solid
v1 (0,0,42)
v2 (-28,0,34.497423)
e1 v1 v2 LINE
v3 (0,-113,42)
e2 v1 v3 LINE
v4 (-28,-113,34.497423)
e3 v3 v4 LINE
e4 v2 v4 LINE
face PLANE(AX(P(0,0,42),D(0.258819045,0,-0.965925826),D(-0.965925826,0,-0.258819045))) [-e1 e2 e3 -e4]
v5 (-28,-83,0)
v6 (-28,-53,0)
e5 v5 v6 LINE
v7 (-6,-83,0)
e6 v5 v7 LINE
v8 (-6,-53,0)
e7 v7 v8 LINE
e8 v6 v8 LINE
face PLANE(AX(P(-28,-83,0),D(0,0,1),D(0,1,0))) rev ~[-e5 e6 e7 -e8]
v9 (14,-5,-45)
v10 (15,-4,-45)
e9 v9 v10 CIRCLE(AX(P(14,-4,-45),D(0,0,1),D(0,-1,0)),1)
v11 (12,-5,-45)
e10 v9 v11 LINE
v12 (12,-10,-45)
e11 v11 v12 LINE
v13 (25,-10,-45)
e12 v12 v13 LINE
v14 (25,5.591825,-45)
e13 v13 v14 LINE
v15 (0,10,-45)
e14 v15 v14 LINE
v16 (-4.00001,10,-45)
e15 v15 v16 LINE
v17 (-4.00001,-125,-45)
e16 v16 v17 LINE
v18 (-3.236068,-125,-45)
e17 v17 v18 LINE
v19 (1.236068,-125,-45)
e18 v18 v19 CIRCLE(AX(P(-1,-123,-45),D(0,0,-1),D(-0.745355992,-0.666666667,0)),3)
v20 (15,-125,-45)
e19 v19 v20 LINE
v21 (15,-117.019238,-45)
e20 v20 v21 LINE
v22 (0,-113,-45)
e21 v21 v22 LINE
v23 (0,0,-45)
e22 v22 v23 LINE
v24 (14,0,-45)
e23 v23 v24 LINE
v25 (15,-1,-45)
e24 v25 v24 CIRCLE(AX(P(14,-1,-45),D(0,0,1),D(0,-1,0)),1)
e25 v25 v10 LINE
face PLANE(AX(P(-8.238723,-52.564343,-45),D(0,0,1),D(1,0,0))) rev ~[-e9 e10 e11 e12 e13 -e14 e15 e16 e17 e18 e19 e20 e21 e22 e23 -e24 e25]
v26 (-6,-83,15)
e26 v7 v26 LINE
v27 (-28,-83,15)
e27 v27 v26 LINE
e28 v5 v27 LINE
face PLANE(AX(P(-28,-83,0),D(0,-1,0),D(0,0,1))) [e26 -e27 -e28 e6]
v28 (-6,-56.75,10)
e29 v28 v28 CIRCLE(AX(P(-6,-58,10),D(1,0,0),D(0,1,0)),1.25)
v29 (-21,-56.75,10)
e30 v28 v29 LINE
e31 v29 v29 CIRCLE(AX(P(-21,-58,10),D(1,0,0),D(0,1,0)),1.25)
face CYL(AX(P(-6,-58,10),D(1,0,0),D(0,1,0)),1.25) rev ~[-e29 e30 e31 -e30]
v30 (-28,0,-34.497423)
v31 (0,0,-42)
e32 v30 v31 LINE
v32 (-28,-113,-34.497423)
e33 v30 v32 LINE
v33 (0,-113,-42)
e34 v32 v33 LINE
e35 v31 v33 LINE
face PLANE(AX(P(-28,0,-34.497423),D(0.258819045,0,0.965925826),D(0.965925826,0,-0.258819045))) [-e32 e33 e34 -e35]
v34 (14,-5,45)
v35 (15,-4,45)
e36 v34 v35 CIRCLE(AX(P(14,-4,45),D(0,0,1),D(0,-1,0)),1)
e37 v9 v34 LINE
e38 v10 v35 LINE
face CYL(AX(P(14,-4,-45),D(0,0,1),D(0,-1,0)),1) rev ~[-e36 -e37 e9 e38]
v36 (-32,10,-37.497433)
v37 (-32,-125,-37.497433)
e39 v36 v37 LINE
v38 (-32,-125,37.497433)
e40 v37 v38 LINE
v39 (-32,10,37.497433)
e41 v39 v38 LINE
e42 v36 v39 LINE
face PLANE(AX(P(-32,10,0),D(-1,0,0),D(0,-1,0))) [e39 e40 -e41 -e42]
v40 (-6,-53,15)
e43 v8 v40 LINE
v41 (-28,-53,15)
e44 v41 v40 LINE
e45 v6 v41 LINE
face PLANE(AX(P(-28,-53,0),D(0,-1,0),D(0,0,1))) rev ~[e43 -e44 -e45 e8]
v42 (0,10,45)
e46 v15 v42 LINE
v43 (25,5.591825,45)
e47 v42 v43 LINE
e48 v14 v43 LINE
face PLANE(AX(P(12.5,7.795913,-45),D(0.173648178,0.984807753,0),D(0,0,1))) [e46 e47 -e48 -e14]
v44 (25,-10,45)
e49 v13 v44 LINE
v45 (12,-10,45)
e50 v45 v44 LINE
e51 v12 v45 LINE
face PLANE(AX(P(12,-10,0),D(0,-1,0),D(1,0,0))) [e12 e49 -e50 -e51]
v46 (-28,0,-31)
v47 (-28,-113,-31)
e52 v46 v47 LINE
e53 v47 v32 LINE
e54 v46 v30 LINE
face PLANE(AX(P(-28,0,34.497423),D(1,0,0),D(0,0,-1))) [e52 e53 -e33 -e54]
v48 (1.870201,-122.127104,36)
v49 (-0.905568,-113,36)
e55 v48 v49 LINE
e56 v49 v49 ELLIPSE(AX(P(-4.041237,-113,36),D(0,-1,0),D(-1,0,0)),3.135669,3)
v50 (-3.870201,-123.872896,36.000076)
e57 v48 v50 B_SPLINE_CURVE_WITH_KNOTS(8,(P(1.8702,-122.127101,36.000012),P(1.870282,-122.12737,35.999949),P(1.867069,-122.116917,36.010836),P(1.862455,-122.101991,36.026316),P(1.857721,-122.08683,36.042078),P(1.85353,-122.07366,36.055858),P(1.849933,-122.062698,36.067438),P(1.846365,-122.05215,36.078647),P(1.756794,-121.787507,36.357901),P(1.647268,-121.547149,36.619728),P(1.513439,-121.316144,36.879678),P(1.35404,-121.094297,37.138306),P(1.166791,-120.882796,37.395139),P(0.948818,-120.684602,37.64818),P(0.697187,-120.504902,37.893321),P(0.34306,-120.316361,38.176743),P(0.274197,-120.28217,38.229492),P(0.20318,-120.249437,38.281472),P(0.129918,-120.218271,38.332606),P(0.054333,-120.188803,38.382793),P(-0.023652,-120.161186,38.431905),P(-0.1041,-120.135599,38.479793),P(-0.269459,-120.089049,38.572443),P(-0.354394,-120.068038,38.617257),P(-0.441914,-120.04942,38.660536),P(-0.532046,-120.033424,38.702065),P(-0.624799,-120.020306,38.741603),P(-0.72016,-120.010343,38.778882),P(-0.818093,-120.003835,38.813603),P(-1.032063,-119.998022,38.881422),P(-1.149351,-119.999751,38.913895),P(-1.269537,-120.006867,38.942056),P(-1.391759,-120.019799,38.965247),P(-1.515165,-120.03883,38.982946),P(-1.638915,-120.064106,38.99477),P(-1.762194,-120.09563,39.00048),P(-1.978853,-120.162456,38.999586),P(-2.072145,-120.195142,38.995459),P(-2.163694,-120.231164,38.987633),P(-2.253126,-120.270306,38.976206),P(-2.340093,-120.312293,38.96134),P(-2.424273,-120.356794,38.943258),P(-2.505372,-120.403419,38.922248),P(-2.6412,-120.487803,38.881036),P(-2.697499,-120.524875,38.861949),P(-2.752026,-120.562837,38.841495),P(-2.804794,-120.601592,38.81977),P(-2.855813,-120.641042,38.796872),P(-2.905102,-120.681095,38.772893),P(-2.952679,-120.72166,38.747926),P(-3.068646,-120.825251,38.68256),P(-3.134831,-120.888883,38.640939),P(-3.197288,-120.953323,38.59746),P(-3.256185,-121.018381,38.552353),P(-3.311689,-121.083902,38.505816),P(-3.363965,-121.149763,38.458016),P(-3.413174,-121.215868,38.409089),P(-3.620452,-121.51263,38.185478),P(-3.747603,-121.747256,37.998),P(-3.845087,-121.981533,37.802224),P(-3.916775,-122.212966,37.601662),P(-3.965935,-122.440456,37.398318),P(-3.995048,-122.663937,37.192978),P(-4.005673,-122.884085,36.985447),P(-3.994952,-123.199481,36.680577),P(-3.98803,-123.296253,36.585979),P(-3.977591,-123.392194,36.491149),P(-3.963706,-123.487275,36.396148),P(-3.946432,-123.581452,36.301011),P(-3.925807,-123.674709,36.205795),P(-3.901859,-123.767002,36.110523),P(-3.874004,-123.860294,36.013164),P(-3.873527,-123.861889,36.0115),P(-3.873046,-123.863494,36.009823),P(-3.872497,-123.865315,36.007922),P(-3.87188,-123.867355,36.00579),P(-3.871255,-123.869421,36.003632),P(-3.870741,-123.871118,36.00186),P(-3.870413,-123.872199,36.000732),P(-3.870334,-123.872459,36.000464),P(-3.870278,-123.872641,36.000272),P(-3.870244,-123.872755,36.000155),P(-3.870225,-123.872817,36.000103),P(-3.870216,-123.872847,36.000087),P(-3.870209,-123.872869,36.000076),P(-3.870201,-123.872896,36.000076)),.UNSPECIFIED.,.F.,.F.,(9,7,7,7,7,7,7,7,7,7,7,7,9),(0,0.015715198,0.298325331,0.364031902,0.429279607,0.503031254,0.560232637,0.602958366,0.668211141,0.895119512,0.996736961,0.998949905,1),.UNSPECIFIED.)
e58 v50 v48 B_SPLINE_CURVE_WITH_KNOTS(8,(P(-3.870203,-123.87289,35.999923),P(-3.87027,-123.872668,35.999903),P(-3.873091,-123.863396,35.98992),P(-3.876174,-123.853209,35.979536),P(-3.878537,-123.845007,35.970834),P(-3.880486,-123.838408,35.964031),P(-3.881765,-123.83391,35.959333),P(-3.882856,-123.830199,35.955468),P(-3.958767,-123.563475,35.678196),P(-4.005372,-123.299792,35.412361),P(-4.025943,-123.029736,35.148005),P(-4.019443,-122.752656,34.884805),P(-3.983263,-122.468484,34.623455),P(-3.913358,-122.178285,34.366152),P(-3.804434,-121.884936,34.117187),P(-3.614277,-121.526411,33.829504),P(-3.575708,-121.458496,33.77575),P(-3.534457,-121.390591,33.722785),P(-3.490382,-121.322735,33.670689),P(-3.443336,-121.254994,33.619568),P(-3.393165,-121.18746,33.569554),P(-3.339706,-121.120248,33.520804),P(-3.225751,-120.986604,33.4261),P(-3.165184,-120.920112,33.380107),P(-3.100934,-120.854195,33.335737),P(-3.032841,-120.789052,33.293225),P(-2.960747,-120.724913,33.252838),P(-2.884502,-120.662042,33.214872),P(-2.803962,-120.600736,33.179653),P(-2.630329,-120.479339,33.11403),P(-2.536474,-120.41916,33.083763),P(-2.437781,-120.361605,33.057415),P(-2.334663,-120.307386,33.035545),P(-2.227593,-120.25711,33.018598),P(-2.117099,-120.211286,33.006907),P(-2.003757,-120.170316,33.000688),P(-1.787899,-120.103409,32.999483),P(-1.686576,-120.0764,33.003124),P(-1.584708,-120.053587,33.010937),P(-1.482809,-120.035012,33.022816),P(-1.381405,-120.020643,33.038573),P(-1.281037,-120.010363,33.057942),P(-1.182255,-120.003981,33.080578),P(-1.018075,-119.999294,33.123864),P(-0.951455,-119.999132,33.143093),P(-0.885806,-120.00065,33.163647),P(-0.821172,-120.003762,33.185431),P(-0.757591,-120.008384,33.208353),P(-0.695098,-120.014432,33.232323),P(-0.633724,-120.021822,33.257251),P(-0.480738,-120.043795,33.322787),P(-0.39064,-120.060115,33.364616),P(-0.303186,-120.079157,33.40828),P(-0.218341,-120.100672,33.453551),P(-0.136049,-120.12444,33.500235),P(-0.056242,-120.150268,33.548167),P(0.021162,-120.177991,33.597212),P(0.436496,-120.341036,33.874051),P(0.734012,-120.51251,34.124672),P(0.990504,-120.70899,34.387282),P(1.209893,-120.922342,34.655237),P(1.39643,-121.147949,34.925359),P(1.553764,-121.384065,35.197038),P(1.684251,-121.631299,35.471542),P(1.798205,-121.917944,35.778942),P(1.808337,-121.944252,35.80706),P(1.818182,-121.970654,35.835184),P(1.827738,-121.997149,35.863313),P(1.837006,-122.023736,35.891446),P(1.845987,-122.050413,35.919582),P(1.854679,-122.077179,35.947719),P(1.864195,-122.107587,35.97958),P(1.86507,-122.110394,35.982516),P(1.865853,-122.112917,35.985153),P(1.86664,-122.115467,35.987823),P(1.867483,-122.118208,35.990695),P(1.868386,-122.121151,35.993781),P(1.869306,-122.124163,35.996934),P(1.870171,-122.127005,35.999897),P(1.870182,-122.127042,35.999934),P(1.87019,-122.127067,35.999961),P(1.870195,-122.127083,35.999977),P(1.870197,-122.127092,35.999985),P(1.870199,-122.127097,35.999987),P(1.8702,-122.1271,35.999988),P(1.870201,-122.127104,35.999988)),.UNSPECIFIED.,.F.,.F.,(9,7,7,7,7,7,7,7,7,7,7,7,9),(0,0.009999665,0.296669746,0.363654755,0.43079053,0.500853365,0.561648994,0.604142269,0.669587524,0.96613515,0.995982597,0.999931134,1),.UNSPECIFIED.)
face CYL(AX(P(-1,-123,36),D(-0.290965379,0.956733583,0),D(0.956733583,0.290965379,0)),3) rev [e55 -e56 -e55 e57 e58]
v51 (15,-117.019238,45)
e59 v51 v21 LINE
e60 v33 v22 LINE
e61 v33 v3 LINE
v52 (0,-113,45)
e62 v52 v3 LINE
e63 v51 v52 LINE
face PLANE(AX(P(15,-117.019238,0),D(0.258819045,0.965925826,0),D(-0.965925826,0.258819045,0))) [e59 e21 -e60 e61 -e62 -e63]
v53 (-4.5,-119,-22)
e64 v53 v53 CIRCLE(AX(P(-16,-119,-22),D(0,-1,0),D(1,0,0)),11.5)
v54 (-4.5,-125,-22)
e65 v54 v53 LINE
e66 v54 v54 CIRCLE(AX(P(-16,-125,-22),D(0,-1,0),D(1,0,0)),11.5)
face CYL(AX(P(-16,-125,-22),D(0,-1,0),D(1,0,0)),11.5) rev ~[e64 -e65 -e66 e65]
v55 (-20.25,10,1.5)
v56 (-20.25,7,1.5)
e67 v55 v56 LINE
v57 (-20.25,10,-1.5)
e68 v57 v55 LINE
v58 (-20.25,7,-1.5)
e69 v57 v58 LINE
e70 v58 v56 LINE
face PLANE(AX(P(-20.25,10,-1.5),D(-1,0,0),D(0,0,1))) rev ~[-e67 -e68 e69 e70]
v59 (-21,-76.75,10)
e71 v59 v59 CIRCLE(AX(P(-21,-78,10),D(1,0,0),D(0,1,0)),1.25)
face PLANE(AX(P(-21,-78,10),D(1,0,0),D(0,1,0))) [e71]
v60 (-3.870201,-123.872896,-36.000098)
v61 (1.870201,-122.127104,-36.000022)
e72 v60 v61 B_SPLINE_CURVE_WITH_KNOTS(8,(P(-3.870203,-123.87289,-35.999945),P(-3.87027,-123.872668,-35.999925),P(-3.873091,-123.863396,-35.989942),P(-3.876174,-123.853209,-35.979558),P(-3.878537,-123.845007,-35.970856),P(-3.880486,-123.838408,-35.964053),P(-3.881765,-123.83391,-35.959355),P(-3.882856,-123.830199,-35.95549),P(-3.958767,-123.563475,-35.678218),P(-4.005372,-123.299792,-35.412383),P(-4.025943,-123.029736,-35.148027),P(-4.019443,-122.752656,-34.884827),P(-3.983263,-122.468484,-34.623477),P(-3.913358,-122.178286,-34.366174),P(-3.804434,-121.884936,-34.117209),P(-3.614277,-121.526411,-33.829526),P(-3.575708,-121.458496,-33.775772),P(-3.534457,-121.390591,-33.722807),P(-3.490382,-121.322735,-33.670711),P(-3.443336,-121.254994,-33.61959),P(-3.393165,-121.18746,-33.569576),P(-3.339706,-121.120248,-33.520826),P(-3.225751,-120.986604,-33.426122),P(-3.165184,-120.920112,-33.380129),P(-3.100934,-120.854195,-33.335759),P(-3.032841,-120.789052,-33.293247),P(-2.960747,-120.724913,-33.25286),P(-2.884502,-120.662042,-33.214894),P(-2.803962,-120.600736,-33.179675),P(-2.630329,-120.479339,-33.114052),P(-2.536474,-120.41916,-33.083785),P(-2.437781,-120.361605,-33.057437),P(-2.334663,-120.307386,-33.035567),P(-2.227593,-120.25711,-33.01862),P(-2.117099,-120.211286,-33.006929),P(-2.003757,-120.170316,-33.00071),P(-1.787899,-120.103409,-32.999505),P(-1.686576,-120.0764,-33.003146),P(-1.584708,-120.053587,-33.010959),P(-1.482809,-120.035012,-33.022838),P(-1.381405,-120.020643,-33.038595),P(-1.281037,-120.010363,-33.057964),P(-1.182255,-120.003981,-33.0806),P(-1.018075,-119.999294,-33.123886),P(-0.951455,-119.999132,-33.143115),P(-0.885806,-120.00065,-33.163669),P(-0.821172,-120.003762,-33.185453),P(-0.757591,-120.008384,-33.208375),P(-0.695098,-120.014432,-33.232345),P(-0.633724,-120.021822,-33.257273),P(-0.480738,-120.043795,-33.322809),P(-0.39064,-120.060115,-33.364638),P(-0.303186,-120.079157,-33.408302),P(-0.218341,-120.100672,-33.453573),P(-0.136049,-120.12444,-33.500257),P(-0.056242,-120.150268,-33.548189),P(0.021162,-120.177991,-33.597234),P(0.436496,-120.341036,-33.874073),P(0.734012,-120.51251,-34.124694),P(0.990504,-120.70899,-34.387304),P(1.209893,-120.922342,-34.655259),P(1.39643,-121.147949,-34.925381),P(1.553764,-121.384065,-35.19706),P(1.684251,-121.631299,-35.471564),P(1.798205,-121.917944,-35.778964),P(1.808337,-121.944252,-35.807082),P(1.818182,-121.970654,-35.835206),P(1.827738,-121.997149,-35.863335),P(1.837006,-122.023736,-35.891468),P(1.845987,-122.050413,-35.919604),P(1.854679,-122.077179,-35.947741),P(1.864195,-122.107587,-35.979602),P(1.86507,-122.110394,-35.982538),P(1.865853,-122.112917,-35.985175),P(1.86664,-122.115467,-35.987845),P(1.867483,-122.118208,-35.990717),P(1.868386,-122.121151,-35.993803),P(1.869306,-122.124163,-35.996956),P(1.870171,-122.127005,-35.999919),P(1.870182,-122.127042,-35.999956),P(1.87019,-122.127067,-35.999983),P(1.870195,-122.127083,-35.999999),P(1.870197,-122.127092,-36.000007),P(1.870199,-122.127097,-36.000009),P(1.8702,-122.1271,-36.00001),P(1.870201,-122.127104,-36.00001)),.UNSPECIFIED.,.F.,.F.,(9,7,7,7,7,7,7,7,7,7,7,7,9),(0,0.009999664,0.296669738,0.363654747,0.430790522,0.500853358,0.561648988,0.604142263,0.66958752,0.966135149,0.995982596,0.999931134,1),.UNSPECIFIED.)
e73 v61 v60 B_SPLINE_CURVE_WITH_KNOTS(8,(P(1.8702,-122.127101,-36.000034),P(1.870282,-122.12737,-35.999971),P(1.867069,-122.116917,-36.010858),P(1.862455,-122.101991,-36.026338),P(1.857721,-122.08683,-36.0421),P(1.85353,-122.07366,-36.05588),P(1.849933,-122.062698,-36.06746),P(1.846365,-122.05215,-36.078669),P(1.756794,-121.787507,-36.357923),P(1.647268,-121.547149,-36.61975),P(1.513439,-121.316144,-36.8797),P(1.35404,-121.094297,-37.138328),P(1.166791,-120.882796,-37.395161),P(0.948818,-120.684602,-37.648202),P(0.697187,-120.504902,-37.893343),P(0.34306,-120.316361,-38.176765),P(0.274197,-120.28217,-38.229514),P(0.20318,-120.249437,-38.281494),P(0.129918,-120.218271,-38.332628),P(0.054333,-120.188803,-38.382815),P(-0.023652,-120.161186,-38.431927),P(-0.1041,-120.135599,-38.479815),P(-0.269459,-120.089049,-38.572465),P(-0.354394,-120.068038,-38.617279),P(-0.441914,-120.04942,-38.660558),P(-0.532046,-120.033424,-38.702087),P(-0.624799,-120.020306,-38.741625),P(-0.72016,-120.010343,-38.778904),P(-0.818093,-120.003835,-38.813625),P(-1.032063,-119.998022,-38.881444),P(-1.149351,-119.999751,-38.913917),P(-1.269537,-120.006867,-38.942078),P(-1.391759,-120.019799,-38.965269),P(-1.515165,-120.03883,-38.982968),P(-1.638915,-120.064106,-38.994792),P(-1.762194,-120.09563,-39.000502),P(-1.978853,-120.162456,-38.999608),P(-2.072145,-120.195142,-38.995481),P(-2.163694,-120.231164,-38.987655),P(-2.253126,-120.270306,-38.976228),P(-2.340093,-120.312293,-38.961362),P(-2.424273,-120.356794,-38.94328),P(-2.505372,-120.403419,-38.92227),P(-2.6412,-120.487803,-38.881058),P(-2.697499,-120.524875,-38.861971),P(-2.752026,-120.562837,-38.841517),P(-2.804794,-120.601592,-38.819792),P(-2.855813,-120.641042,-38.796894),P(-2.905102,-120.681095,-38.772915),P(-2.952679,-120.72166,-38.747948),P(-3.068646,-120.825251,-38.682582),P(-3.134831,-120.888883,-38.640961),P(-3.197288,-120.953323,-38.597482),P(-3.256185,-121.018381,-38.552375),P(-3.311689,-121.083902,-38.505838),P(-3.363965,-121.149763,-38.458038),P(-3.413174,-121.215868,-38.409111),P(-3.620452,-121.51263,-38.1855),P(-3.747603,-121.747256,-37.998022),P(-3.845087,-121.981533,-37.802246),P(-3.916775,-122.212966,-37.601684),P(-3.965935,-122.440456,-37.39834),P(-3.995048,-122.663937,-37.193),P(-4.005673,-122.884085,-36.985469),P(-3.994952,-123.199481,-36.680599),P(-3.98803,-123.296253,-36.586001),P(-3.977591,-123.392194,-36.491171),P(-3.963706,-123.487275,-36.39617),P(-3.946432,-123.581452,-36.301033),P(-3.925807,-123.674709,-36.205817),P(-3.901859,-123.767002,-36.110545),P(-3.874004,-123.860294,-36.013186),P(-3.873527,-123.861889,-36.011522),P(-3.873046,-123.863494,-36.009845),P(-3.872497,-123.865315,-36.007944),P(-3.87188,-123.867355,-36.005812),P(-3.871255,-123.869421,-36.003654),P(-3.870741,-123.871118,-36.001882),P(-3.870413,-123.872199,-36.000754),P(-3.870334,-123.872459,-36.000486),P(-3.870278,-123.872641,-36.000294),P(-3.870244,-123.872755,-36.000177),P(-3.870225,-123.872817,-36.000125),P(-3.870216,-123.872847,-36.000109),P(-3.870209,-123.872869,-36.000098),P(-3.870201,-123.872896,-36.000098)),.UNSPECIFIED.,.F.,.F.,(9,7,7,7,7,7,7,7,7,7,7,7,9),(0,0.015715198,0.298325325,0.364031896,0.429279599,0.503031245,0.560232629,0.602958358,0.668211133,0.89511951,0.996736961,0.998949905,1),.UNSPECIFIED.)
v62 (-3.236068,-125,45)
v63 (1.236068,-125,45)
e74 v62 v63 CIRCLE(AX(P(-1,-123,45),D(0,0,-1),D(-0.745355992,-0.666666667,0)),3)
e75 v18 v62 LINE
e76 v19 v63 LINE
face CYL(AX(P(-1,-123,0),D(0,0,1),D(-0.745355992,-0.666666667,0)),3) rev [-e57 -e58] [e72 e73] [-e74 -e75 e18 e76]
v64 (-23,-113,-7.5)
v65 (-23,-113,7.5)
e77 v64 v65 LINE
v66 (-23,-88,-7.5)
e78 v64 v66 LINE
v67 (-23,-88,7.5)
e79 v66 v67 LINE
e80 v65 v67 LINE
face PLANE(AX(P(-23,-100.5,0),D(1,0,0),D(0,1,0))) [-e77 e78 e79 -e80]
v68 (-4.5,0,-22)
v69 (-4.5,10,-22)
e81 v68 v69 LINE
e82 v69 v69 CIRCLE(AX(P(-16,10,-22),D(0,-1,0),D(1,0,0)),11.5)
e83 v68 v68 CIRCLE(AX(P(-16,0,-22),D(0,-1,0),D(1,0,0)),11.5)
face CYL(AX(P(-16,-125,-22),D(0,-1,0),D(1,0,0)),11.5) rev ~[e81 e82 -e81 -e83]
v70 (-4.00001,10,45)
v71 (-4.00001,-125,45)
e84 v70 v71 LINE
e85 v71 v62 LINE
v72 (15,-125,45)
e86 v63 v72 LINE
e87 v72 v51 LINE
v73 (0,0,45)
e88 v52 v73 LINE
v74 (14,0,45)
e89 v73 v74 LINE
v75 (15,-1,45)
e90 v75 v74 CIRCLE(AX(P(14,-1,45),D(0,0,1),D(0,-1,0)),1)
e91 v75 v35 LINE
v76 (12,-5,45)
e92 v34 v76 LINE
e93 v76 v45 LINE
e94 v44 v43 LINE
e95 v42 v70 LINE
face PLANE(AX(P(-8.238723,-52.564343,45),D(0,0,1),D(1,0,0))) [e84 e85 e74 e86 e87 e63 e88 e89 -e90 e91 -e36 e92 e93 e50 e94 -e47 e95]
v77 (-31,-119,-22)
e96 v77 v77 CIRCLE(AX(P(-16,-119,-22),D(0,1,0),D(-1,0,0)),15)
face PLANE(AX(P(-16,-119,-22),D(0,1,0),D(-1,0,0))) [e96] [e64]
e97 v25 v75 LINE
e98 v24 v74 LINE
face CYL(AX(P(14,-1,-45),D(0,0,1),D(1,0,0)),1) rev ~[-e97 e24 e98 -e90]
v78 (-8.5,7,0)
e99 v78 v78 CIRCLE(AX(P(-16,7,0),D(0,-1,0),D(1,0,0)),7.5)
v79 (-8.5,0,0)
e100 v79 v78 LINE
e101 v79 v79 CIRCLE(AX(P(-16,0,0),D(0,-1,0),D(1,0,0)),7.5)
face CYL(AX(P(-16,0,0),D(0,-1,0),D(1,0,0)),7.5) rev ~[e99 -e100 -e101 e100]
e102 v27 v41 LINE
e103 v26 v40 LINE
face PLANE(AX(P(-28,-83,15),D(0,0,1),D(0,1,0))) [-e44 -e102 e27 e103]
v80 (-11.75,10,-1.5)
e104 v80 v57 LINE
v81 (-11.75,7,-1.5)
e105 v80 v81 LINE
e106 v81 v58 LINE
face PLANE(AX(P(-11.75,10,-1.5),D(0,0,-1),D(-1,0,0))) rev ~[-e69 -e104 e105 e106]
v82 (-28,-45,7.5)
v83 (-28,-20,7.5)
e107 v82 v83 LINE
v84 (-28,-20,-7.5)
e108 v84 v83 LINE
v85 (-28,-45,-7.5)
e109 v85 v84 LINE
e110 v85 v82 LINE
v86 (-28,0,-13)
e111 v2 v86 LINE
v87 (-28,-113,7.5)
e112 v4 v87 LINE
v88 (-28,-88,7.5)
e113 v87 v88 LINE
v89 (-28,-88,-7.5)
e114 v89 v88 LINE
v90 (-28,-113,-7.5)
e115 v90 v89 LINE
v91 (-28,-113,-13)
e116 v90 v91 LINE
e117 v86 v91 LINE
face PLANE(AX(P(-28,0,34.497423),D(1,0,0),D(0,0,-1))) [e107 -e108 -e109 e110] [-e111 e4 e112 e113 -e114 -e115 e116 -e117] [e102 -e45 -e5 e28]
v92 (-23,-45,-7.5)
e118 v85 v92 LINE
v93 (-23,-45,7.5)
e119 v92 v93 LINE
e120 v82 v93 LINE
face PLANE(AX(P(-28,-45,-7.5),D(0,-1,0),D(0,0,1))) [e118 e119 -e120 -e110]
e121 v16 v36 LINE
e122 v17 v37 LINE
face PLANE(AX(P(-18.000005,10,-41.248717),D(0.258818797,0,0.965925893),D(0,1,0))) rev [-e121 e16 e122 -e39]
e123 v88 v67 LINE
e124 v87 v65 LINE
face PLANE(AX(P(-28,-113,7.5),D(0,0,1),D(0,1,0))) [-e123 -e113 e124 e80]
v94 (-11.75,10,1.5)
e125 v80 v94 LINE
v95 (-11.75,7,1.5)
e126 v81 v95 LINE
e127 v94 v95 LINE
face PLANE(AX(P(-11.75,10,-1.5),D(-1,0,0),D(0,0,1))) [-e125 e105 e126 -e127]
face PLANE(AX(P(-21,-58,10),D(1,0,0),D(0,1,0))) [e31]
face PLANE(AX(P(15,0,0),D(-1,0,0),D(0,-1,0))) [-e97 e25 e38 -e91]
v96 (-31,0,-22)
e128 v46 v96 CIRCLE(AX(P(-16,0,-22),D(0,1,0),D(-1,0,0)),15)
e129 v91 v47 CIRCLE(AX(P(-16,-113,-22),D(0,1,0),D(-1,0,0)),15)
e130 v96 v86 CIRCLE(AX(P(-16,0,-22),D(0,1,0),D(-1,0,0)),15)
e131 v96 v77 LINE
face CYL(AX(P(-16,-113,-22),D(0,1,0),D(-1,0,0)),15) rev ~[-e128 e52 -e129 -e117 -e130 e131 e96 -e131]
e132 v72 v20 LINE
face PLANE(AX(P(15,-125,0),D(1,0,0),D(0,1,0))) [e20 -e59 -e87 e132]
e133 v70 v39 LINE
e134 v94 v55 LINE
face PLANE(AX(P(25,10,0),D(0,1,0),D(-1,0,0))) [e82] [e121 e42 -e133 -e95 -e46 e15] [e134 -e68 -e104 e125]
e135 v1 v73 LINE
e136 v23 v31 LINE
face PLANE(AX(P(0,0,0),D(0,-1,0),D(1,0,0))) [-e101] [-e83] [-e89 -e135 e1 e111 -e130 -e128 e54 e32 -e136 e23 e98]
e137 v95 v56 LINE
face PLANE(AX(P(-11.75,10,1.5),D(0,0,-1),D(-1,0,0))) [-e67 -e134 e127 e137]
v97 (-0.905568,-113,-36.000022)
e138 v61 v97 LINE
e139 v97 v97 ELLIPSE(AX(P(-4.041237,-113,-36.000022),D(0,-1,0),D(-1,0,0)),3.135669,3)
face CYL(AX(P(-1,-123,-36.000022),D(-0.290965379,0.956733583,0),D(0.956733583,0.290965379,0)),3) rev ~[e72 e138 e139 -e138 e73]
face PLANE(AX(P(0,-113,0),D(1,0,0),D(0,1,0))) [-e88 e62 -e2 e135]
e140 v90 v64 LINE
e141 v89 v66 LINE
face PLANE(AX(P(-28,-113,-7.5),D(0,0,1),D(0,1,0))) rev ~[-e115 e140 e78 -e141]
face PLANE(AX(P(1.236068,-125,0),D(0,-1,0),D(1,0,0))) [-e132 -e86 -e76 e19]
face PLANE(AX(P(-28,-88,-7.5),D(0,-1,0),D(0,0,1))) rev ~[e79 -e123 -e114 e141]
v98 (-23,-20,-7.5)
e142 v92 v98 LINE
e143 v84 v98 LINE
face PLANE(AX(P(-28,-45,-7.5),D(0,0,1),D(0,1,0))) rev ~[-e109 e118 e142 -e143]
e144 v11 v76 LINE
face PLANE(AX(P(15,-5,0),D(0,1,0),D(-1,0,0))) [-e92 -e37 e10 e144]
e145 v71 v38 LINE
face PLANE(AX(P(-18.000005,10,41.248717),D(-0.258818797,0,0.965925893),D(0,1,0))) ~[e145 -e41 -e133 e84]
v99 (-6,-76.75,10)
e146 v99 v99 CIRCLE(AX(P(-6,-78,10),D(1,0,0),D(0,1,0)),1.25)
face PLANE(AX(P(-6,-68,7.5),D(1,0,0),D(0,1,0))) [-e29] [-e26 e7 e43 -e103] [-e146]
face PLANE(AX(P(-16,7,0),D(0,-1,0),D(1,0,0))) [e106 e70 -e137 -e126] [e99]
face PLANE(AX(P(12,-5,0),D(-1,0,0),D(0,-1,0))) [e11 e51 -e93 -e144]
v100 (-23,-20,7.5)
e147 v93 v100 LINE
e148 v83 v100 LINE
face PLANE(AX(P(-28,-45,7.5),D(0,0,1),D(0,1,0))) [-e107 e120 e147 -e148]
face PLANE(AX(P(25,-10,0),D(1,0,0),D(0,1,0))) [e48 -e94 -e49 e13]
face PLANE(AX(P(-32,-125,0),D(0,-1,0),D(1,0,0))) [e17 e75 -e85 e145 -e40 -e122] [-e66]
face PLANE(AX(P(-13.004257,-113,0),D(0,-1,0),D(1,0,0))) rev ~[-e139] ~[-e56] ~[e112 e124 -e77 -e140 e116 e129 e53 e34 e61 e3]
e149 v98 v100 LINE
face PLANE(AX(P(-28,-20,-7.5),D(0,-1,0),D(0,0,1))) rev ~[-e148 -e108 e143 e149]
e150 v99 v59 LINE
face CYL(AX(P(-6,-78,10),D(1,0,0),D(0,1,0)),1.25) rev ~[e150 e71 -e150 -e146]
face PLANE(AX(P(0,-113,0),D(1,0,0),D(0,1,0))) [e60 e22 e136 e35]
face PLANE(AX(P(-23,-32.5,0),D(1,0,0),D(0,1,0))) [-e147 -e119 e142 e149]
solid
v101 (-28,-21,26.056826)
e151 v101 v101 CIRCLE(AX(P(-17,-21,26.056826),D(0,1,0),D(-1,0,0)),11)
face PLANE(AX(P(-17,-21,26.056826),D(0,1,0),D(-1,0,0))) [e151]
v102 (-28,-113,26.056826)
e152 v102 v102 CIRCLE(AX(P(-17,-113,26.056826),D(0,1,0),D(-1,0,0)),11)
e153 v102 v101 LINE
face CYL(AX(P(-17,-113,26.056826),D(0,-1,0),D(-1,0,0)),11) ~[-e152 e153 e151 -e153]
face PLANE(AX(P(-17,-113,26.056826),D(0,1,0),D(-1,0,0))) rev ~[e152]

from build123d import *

# Parameters (mm, degrees)
F1_DEPTH  = 45
F2_SIZE2  = 7.502567
F2_SIZE   = 27.99999
F3_SIZE2  = 7.502567
F3_SIZE   = 27.99999
F5_DEPTH  = 113
F6_R      = 11.5
F7_DEPTH  = 135.001
F8_R      = 15
F9_DEPTH  = 6
F10_DEPTH = 113
F11_W     = 30
F11_H     = 15
F12_DEPTH = 22
F13_R     = 1.25
F14_DEPTH = 15
F15_W     = 8.5
F15_H     = 3
F16_DEPTH = 10
F17_R     = 7.5
F18_DEPTH = 7
F19_W     = 25
F19_H     = 15
F20_DEPTH = 5
F21_SIZE2 = 4.4081745177
F21_SIZE  = 25
F25_R     = 11
F26_DEPTH = 92
F27_R     = 1


# Not quite as in the source:
# - a fillet or chamfer is up to 0.001 mm smaller than in the source, because OpenCascade refuses the exact size
# - a pattern or mirror of a feature is missing from the dataset's text; its kind, count and spacing are read off the source's solid


with BuildPart() as f1:
    # F0 (on Top) → F1 (new body, symmetric)
    with BuildSketch(Plane.XY):
        with BuildLine():
            Line((0, -113), (0, 0))
            Line((0, 0), (15, 0))
            Line((15, 0), (15, -5))
            Line((15, -5), (12, -5))
            Line((12, -5), (12, -10))
            Line((12, -10), (25, -10))
            Line((25, -10), (25, 10))
            Line((25, 10), (-32, 10))
            Line((-32, 10), (-32, -125))
            Line((-32, -125), (-3.2360679775, -125))
            ThreePointArc((-3.2360679775, -125), (-1, -120), (1.2360679775, -125))
            Line((1.2360679775, -125), (15, -125))
            Line((15, -125), (15, -117.0192378865))
            Line((15, -117.0192378865), (0, -113))
        make_face()
    extrude(amount=F1_DEPTH, both=True)

    # F2 (size 28 and 7.5025773881 in the source; OpenCascade refuses exactly that, so slightly less here)
    f2_edges = [f1.edges().sort_by_distance(p)[0] for p in [
        (-32, -57.5, 45),
    ]]
    f2_side = f1.faces().sort_by_distance((-13.040115, -54.60791, 45))[0]
    chamfer(f2_edges, length=F2_SIZE, length2=F2_SIZE2, reference=f2_side)

    # F3 (size 28 and 7.5025773881 in the source; OpenCascade refuses exactly that, so slightly less here)
    f3_edges = [f1.edges().sort_by_distance(p)[0] for p in [
        (-32, -57.5, -45),
    ]]
    f3_side = f1.faces().sort_by_distance((-13.040115, -54.60791, -45))[0]
    chamfer(f3_edges, length=F3_SIZE, length2=F3_SIZE2, reference=f3_side)

    # F4 (on face) → F5 (cut)
    with BuildSketch(Plane.XZ):
        Polygon((0, -42), (0, 0), (0, 42), (-28, 34.4974226119), (-28, 0), (-28, -34.4974226119), align=None)
    extrude(amount=F5_DEPTH, mode=Mode.SUBTRACT)

    # F6 (on face) → F7 (cut, through all)
    with BuildSketch(Plane.XZ.offset(125)):
        with Locations((-16, -22)):
            Circle(F6_R)
    extrude(amount=-F7_DEPTH, mode=Mode.SUBTRACT)

    # F8 (on face) → F9 (cut)
    with BuildSketch(Plane(origin=(0, -113, 0), x_dir=(-1, 0, 0), z_dir=(0, 1, 0))):
        with Locations((16, -22)):
            Circle(F8_R)
    extrude(amount=-F9_DEPTH, mode=Mode.SUBTRACT)

    # F8 (on face) → F10 (cut, through all)
    with BuildSketch(Plane(origin=(0, -113, 0), x_dir=(-1, 0, 0), z_dir=(0, 1, 0))):
        with Locations((16, -22)):
            Circle(F8_R)
    extrude(amount=F10_DEPTH, mode=Mode.SUBTRACT)

    # F11 (on face) → F12 (join)
    with BuildSketch(Plane.YZ.offset(-28)):
        with Locations((-68, 7.5)):
            Rectangle(F11_W, F11_H)
    extrude(amount=F12_DEPTH)

    # F13 (on face) → F14 (cut)
    with BuildSketch(Plane.YZ.offset(-6)):
        with Locations((-78, 10)):
            Circle(F13_R)
        with Locations((-58, 10)):
            Circle(F13_R)
    extrude(amount=-F14_DEPTH, mode=Mode.SUBTRACT)

    # F15 (on face) → F16 (cut, through all)
    with BuildSketch(Plane(origin=(0, 10, 0), x_dir=(-1, 0, 0), z_dir=(0, 1, 0))):
        with Locations((16, 0)):
            Rectangle(F15_W, F15_H)
    extrude(amount=-F16_DEPTH, mode=Mode.SUBTRACT)

    # F17 (on face) → F18 (cut)
    with BuildSketch(Plane.XZ):
        with Locations((-16, 0)):
            Circle(F17_R)
    extrude(amount=-F18_DEPTH, mode=Mode.SUBTRACT)

    # F19 (on face) → F20 (join)
    with BuildSketch(Plane.YZ.offset(-28)):
        with Locations((-100.5, 0)):
            Rectangle(F19_W, F19_H)
        with Locations((-32.5, 0)):
            Rectangle(F19_W, F19_H)
    extrude(amount=F20_DEPTH)

    # F21
    f21_edges = [f1.edges().sort_by_distance(p)[0] for p in [
        (25, 10, 0),
    ]]
    f21_side = f1.faces().sort_by_distance((-1.370356, 10, 2.040759))[0]
    chamfer(f21_edges, length=F21_SIZE, length2=F21_SIZE2, reference=f21_side)

    # F23 (on offset) → F24 (revolve, cut)
    with BuildSketch(Plane.XY.offset(36)):
        Polygon((-4.9269355532, -99.7771988864), (-7.7971363015, -100.6500950226), (-1, -123), (1.8702007483, -122.1271038638), align=None)
    f24 = revolve(axis=Axis((-4.3985681508, -111.8250475113, 36), (0.2909653787, -0.9567335828, 0)), mode=Mode.SUBTRACT)

    # F24_copies: F24 across plane
    add(f24.mirror(Plane(origin=(0, 0, -1.1e-05), x_dir=(-1, 0, 0), z_dir=(0, 0, -1))), mode=Mode.SUBTRACT)

    # F27
    f27_edges = [f1.edges().sort_by_distance(p)[0] for p in [
        (15, 0, 0),
        (15, -5, 0),
    ]]
    fillet(f27_edges, radius=F27_R)


with BuildPart() as f26:
    # F25 (on face) → F26 (new body)
    with BuildSketch(Plane(origin=(0, -113, 0), x_dir=(-1, 0, 0), z_dir=(0, 1, 0))):
        with Locations((17, 26.0568257442)):
            Circle(F25_R)
    extrude(amount=F26_DEPTH)


solid = Compound([f1.part, f26.part])
